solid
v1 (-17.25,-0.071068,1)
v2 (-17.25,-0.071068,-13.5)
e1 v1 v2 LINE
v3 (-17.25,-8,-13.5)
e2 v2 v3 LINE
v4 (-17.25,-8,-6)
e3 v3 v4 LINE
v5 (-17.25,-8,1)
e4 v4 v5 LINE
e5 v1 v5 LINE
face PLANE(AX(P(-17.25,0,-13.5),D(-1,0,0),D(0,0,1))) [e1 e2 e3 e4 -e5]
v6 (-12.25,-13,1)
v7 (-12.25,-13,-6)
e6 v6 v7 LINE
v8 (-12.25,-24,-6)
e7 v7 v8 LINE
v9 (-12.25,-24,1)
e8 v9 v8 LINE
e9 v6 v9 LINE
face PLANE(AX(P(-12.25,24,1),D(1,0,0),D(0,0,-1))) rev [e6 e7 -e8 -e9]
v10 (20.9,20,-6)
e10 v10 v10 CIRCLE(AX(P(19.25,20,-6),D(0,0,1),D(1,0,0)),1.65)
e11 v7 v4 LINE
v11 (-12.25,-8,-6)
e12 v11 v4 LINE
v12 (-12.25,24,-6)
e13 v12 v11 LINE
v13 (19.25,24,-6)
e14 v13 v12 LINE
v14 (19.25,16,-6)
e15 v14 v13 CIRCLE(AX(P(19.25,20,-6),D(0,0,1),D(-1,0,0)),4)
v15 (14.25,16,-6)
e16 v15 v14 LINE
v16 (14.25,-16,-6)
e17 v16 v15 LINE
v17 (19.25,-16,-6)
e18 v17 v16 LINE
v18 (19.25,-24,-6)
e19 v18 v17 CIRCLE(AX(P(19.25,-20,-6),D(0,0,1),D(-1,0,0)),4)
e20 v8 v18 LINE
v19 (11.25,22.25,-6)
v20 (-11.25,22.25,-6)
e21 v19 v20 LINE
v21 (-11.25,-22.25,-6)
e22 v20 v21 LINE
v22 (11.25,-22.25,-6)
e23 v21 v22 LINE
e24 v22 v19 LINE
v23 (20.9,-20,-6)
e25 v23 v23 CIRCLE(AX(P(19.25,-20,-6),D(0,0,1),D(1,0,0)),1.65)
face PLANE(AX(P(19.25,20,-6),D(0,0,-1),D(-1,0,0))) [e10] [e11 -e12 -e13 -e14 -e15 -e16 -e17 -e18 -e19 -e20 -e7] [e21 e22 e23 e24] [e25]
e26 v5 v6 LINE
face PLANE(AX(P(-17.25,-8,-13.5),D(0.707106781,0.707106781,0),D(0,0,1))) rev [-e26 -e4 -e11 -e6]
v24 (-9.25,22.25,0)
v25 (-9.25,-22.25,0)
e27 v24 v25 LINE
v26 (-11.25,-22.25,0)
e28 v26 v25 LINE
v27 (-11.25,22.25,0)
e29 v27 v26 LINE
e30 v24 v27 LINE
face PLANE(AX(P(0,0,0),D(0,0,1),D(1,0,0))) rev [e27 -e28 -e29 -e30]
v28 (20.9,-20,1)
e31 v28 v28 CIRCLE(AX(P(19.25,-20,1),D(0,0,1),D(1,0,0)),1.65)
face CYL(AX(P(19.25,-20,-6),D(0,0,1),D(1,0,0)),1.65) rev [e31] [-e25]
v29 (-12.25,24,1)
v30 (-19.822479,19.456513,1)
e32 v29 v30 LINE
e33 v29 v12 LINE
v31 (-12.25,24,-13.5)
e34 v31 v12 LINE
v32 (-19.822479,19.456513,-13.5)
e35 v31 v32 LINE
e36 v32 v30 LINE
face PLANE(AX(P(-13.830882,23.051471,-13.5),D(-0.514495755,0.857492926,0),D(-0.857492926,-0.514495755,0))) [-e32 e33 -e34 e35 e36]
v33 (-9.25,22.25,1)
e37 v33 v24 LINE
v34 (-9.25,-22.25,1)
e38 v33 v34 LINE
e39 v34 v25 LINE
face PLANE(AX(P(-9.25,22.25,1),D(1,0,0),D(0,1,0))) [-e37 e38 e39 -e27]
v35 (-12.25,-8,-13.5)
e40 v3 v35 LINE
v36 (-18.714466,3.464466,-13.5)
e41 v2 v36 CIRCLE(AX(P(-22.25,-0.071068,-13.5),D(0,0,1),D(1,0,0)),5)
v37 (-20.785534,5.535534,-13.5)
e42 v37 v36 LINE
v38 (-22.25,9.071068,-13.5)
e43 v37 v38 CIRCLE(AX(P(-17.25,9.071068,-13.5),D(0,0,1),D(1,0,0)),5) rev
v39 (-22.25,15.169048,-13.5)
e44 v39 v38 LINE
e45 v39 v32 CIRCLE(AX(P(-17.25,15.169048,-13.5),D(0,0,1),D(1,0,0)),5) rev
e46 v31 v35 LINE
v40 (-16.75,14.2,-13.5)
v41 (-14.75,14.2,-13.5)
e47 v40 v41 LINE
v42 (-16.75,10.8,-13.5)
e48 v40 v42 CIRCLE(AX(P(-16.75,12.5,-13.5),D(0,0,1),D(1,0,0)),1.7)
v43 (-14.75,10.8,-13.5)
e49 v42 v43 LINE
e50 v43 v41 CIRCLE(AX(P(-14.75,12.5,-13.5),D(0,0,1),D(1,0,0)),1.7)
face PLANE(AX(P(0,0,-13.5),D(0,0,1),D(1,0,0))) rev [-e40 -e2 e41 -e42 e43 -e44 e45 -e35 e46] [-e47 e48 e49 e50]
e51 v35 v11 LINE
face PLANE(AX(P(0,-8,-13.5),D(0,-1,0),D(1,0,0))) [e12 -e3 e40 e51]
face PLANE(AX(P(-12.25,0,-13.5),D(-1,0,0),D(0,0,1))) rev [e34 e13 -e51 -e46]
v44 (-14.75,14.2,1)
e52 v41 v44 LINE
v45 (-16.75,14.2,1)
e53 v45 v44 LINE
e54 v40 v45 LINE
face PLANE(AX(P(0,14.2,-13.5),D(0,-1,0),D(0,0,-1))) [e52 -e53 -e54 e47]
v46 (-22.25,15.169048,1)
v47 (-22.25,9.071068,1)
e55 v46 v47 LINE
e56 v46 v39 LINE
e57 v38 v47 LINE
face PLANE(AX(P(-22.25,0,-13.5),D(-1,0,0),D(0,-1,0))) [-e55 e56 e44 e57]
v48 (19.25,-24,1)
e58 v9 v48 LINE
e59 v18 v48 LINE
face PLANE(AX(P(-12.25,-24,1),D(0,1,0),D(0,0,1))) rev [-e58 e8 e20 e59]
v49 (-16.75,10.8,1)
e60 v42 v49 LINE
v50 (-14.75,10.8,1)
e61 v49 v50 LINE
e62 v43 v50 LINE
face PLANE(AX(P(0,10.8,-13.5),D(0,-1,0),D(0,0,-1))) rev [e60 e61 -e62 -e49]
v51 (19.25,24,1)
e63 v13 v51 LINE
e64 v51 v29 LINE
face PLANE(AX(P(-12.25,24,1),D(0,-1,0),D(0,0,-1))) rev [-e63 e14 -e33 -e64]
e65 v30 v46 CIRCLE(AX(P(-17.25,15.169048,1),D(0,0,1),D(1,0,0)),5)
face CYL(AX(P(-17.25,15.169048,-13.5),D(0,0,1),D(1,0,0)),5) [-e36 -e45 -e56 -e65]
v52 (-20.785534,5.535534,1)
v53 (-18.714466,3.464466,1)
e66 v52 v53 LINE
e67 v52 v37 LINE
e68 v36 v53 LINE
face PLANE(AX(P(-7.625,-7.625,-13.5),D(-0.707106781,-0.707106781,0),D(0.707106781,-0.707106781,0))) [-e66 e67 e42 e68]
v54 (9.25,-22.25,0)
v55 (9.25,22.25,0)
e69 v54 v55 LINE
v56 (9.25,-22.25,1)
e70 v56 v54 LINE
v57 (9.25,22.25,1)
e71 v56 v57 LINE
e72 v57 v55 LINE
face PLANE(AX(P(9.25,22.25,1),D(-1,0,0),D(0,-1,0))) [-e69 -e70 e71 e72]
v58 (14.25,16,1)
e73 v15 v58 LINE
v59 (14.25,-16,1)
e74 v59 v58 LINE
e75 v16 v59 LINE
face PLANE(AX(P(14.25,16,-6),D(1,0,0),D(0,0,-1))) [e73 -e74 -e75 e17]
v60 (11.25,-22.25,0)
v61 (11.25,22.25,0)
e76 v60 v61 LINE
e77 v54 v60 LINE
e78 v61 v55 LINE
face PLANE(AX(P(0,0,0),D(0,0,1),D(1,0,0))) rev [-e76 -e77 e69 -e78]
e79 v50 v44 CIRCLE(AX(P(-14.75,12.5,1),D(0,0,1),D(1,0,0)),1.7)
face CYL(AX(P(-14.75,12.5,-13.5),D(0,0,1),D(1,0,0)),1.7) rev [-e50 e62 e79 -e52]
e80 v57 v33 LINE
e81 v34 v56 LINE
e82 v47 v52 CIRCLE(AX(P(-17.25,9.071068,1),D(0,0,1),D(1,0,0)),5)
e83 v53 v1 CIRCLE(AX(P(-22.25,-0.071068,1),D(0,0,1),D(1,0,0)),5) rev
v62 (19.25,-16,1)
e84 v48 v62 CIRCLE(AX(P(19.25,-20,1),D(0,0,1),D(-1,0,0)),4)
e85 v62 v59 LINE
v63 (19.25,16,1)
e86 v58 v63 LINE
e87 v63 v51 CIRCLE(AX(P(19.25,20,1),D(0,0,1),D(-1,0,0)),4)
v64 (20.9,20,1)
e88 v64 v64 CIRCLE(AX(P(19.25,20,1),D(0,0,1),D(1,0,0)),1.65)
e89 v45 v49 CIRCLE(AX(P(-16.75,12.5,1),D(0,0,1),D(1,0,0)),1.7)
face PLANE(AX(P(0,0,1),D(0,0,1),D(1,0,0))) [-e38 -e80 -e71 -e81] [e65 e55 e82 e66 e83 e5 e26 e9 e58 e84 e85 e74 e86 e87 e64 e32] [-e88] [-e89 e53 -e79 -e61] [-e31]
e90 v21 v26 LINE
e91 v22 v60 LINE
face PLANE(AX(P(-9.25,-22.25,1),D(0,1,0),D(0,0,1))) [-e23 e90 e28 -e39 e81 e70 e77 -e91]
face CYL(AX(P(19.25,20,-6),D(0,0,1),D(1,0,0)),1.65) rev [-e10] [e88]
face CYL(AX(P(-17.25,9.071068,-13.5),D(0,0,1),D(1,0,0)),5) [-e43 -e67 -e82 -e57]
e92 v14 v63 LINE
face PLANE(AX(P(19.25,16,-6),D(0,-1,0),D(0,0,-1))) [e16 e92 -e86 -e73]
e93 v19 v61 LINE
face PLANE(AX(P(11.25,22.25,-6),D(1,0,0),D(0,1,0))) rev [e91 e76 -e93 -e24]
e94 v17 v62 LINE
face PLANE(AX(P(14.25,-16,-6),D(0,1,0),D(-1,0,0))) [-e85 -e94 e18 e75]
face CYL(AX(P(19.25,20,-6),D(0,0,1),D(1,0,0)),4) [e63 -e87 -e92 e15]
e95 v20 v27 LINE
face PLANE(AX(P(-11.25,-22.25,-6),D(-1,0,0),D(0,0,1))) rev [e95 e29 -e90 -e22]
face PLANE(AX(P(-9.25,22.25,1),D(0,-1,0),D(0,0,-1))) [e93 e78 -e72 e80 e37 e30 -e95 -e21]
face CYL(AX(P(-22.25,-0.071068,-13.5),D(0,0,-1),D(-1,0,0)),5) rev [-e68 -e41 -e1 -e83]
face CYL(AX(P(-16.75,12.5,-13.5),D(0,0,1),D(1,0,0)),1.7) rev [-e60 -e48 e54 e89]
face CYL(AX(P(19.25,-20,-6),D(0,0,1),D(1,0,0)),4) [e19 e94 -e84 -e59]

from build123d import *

# Parameters (mm, degrees)
ESBO_O1_W                = 24.5
ESBO_O1_H                = 48
ESBO_O1_W_2              = 18.5
ESBO_O1_H_2              = 44.5
RESSALTO_EXTRUS_O1_DEPTH = 1
ESBO_O2_R                = 1.65
ESBO_O2_W                = 22.5
ESBO_O2_H                = 44.5
RESSALTO_EXTRUS_O2_DEPTH = 7
RESSALTO_EXTRUS_O3_DEPTH = 14.5
FILETE1_R                = 5
CHANFRO4_SIZE            = 5


with BuildPart() as part:
    # Esboço1 → Ressalto-extrusão1 (new body)
    with BuildSketch(Plane.XY):
        Rectangle(ESBO_O1_W, ESBO_O1_H)
        Rectangle(ESBO_O1_W_2, ESBO_O1_H_2, mode=Mode.SUBTRACT)
    extrude(amount=RESSALTO_EXTRUS_O1_DEPTH)

    # Esboço2 → Ressalto-extrusão2 (add)
    with BuildSketch(Plane.XY.offset(1)):
        with BuildLine():
            Line((19.25, 16), (14.25, 16))
            Line((14.25, 16), (14.25, -16))
            Line((14.25, -16), (19.25, -16))
            ThreePointArc((19.25, -16), (23.25, -20), (19.25, -24))
            Line((19.25, -24), (12.25, -24))
            Line((12.25, -24), (-12.25, -24))
            Line((-12.25, -24), (-12.25, 24))
            Line((-12.25, 24), (12.25, 24))
            Line((12.25, 24), (19.25, 24))
            ThreePointArc((19.25, 24), (23.25, 20), (19.25, 16))
        make_face()
        with Locations((19.25, 20)):
            Circle(ESBO_O2_R, mode=Mode.SUBTRACT)
        with Locations((19.25, -20)):
            Circle(ESBO_O2_R, mode=Mode.SUBTRACT)
        Rectangle(ESBO_O2_W, ESBO_O2_H, mode=Mode.SUBTRACT)
    extrude(amount=-RESSALTO_EXTRUS_O2_DEPTH)

    # Esboço4 → Ressalto-extrusão3 (add)
    with BuildSketch(Plane.XY.offset(1)):
        Polygon((-12.25, -8), (-12.25, 24), (-22.25, 18), (-22.25, 7), (-17.25, 2), (-17.25, -8), align=None)
        with BuildLine():
            ThreePointArc((-16.75, 10.8), (-18.45, 12.5), (-16.75, 14.2))
            Line((-16.75, 14.2), (-14.75, 14.2))
            ThreePointArc((-14.75, 14.2), (-13.05, 12.5), (-14.75, 10.8))
            Line((-14.75, 10.8), (-16.75, 10.8))
        make_face(mode=Mode.SUBTRACT)
    extrude(amount=-RESSALTO_EXTRUS_O3_DEPTH)

    # Filete1
    filete1_edges = [part.edges().sort_by_distance(p)[0] for p in [
        (-17.25, 2, -6.25),
        (-22.25, 7, -6.25),
        (-22.25, 18, -6.25),
    ]]
    fillet(filete1_edges, radius=FILETE1_R)

    # Chanfro4
    chanfro4_edges = [part.edges().sort_by_distance(p)[0] for p in [
        (-12.25, -8, -2.5),
    ]]
    chamfer(chanfro4_edges, length=CHANFRO4_SIZE - 0.0001)  # a hair under: the kernel refuses the full size


solid = part.part
